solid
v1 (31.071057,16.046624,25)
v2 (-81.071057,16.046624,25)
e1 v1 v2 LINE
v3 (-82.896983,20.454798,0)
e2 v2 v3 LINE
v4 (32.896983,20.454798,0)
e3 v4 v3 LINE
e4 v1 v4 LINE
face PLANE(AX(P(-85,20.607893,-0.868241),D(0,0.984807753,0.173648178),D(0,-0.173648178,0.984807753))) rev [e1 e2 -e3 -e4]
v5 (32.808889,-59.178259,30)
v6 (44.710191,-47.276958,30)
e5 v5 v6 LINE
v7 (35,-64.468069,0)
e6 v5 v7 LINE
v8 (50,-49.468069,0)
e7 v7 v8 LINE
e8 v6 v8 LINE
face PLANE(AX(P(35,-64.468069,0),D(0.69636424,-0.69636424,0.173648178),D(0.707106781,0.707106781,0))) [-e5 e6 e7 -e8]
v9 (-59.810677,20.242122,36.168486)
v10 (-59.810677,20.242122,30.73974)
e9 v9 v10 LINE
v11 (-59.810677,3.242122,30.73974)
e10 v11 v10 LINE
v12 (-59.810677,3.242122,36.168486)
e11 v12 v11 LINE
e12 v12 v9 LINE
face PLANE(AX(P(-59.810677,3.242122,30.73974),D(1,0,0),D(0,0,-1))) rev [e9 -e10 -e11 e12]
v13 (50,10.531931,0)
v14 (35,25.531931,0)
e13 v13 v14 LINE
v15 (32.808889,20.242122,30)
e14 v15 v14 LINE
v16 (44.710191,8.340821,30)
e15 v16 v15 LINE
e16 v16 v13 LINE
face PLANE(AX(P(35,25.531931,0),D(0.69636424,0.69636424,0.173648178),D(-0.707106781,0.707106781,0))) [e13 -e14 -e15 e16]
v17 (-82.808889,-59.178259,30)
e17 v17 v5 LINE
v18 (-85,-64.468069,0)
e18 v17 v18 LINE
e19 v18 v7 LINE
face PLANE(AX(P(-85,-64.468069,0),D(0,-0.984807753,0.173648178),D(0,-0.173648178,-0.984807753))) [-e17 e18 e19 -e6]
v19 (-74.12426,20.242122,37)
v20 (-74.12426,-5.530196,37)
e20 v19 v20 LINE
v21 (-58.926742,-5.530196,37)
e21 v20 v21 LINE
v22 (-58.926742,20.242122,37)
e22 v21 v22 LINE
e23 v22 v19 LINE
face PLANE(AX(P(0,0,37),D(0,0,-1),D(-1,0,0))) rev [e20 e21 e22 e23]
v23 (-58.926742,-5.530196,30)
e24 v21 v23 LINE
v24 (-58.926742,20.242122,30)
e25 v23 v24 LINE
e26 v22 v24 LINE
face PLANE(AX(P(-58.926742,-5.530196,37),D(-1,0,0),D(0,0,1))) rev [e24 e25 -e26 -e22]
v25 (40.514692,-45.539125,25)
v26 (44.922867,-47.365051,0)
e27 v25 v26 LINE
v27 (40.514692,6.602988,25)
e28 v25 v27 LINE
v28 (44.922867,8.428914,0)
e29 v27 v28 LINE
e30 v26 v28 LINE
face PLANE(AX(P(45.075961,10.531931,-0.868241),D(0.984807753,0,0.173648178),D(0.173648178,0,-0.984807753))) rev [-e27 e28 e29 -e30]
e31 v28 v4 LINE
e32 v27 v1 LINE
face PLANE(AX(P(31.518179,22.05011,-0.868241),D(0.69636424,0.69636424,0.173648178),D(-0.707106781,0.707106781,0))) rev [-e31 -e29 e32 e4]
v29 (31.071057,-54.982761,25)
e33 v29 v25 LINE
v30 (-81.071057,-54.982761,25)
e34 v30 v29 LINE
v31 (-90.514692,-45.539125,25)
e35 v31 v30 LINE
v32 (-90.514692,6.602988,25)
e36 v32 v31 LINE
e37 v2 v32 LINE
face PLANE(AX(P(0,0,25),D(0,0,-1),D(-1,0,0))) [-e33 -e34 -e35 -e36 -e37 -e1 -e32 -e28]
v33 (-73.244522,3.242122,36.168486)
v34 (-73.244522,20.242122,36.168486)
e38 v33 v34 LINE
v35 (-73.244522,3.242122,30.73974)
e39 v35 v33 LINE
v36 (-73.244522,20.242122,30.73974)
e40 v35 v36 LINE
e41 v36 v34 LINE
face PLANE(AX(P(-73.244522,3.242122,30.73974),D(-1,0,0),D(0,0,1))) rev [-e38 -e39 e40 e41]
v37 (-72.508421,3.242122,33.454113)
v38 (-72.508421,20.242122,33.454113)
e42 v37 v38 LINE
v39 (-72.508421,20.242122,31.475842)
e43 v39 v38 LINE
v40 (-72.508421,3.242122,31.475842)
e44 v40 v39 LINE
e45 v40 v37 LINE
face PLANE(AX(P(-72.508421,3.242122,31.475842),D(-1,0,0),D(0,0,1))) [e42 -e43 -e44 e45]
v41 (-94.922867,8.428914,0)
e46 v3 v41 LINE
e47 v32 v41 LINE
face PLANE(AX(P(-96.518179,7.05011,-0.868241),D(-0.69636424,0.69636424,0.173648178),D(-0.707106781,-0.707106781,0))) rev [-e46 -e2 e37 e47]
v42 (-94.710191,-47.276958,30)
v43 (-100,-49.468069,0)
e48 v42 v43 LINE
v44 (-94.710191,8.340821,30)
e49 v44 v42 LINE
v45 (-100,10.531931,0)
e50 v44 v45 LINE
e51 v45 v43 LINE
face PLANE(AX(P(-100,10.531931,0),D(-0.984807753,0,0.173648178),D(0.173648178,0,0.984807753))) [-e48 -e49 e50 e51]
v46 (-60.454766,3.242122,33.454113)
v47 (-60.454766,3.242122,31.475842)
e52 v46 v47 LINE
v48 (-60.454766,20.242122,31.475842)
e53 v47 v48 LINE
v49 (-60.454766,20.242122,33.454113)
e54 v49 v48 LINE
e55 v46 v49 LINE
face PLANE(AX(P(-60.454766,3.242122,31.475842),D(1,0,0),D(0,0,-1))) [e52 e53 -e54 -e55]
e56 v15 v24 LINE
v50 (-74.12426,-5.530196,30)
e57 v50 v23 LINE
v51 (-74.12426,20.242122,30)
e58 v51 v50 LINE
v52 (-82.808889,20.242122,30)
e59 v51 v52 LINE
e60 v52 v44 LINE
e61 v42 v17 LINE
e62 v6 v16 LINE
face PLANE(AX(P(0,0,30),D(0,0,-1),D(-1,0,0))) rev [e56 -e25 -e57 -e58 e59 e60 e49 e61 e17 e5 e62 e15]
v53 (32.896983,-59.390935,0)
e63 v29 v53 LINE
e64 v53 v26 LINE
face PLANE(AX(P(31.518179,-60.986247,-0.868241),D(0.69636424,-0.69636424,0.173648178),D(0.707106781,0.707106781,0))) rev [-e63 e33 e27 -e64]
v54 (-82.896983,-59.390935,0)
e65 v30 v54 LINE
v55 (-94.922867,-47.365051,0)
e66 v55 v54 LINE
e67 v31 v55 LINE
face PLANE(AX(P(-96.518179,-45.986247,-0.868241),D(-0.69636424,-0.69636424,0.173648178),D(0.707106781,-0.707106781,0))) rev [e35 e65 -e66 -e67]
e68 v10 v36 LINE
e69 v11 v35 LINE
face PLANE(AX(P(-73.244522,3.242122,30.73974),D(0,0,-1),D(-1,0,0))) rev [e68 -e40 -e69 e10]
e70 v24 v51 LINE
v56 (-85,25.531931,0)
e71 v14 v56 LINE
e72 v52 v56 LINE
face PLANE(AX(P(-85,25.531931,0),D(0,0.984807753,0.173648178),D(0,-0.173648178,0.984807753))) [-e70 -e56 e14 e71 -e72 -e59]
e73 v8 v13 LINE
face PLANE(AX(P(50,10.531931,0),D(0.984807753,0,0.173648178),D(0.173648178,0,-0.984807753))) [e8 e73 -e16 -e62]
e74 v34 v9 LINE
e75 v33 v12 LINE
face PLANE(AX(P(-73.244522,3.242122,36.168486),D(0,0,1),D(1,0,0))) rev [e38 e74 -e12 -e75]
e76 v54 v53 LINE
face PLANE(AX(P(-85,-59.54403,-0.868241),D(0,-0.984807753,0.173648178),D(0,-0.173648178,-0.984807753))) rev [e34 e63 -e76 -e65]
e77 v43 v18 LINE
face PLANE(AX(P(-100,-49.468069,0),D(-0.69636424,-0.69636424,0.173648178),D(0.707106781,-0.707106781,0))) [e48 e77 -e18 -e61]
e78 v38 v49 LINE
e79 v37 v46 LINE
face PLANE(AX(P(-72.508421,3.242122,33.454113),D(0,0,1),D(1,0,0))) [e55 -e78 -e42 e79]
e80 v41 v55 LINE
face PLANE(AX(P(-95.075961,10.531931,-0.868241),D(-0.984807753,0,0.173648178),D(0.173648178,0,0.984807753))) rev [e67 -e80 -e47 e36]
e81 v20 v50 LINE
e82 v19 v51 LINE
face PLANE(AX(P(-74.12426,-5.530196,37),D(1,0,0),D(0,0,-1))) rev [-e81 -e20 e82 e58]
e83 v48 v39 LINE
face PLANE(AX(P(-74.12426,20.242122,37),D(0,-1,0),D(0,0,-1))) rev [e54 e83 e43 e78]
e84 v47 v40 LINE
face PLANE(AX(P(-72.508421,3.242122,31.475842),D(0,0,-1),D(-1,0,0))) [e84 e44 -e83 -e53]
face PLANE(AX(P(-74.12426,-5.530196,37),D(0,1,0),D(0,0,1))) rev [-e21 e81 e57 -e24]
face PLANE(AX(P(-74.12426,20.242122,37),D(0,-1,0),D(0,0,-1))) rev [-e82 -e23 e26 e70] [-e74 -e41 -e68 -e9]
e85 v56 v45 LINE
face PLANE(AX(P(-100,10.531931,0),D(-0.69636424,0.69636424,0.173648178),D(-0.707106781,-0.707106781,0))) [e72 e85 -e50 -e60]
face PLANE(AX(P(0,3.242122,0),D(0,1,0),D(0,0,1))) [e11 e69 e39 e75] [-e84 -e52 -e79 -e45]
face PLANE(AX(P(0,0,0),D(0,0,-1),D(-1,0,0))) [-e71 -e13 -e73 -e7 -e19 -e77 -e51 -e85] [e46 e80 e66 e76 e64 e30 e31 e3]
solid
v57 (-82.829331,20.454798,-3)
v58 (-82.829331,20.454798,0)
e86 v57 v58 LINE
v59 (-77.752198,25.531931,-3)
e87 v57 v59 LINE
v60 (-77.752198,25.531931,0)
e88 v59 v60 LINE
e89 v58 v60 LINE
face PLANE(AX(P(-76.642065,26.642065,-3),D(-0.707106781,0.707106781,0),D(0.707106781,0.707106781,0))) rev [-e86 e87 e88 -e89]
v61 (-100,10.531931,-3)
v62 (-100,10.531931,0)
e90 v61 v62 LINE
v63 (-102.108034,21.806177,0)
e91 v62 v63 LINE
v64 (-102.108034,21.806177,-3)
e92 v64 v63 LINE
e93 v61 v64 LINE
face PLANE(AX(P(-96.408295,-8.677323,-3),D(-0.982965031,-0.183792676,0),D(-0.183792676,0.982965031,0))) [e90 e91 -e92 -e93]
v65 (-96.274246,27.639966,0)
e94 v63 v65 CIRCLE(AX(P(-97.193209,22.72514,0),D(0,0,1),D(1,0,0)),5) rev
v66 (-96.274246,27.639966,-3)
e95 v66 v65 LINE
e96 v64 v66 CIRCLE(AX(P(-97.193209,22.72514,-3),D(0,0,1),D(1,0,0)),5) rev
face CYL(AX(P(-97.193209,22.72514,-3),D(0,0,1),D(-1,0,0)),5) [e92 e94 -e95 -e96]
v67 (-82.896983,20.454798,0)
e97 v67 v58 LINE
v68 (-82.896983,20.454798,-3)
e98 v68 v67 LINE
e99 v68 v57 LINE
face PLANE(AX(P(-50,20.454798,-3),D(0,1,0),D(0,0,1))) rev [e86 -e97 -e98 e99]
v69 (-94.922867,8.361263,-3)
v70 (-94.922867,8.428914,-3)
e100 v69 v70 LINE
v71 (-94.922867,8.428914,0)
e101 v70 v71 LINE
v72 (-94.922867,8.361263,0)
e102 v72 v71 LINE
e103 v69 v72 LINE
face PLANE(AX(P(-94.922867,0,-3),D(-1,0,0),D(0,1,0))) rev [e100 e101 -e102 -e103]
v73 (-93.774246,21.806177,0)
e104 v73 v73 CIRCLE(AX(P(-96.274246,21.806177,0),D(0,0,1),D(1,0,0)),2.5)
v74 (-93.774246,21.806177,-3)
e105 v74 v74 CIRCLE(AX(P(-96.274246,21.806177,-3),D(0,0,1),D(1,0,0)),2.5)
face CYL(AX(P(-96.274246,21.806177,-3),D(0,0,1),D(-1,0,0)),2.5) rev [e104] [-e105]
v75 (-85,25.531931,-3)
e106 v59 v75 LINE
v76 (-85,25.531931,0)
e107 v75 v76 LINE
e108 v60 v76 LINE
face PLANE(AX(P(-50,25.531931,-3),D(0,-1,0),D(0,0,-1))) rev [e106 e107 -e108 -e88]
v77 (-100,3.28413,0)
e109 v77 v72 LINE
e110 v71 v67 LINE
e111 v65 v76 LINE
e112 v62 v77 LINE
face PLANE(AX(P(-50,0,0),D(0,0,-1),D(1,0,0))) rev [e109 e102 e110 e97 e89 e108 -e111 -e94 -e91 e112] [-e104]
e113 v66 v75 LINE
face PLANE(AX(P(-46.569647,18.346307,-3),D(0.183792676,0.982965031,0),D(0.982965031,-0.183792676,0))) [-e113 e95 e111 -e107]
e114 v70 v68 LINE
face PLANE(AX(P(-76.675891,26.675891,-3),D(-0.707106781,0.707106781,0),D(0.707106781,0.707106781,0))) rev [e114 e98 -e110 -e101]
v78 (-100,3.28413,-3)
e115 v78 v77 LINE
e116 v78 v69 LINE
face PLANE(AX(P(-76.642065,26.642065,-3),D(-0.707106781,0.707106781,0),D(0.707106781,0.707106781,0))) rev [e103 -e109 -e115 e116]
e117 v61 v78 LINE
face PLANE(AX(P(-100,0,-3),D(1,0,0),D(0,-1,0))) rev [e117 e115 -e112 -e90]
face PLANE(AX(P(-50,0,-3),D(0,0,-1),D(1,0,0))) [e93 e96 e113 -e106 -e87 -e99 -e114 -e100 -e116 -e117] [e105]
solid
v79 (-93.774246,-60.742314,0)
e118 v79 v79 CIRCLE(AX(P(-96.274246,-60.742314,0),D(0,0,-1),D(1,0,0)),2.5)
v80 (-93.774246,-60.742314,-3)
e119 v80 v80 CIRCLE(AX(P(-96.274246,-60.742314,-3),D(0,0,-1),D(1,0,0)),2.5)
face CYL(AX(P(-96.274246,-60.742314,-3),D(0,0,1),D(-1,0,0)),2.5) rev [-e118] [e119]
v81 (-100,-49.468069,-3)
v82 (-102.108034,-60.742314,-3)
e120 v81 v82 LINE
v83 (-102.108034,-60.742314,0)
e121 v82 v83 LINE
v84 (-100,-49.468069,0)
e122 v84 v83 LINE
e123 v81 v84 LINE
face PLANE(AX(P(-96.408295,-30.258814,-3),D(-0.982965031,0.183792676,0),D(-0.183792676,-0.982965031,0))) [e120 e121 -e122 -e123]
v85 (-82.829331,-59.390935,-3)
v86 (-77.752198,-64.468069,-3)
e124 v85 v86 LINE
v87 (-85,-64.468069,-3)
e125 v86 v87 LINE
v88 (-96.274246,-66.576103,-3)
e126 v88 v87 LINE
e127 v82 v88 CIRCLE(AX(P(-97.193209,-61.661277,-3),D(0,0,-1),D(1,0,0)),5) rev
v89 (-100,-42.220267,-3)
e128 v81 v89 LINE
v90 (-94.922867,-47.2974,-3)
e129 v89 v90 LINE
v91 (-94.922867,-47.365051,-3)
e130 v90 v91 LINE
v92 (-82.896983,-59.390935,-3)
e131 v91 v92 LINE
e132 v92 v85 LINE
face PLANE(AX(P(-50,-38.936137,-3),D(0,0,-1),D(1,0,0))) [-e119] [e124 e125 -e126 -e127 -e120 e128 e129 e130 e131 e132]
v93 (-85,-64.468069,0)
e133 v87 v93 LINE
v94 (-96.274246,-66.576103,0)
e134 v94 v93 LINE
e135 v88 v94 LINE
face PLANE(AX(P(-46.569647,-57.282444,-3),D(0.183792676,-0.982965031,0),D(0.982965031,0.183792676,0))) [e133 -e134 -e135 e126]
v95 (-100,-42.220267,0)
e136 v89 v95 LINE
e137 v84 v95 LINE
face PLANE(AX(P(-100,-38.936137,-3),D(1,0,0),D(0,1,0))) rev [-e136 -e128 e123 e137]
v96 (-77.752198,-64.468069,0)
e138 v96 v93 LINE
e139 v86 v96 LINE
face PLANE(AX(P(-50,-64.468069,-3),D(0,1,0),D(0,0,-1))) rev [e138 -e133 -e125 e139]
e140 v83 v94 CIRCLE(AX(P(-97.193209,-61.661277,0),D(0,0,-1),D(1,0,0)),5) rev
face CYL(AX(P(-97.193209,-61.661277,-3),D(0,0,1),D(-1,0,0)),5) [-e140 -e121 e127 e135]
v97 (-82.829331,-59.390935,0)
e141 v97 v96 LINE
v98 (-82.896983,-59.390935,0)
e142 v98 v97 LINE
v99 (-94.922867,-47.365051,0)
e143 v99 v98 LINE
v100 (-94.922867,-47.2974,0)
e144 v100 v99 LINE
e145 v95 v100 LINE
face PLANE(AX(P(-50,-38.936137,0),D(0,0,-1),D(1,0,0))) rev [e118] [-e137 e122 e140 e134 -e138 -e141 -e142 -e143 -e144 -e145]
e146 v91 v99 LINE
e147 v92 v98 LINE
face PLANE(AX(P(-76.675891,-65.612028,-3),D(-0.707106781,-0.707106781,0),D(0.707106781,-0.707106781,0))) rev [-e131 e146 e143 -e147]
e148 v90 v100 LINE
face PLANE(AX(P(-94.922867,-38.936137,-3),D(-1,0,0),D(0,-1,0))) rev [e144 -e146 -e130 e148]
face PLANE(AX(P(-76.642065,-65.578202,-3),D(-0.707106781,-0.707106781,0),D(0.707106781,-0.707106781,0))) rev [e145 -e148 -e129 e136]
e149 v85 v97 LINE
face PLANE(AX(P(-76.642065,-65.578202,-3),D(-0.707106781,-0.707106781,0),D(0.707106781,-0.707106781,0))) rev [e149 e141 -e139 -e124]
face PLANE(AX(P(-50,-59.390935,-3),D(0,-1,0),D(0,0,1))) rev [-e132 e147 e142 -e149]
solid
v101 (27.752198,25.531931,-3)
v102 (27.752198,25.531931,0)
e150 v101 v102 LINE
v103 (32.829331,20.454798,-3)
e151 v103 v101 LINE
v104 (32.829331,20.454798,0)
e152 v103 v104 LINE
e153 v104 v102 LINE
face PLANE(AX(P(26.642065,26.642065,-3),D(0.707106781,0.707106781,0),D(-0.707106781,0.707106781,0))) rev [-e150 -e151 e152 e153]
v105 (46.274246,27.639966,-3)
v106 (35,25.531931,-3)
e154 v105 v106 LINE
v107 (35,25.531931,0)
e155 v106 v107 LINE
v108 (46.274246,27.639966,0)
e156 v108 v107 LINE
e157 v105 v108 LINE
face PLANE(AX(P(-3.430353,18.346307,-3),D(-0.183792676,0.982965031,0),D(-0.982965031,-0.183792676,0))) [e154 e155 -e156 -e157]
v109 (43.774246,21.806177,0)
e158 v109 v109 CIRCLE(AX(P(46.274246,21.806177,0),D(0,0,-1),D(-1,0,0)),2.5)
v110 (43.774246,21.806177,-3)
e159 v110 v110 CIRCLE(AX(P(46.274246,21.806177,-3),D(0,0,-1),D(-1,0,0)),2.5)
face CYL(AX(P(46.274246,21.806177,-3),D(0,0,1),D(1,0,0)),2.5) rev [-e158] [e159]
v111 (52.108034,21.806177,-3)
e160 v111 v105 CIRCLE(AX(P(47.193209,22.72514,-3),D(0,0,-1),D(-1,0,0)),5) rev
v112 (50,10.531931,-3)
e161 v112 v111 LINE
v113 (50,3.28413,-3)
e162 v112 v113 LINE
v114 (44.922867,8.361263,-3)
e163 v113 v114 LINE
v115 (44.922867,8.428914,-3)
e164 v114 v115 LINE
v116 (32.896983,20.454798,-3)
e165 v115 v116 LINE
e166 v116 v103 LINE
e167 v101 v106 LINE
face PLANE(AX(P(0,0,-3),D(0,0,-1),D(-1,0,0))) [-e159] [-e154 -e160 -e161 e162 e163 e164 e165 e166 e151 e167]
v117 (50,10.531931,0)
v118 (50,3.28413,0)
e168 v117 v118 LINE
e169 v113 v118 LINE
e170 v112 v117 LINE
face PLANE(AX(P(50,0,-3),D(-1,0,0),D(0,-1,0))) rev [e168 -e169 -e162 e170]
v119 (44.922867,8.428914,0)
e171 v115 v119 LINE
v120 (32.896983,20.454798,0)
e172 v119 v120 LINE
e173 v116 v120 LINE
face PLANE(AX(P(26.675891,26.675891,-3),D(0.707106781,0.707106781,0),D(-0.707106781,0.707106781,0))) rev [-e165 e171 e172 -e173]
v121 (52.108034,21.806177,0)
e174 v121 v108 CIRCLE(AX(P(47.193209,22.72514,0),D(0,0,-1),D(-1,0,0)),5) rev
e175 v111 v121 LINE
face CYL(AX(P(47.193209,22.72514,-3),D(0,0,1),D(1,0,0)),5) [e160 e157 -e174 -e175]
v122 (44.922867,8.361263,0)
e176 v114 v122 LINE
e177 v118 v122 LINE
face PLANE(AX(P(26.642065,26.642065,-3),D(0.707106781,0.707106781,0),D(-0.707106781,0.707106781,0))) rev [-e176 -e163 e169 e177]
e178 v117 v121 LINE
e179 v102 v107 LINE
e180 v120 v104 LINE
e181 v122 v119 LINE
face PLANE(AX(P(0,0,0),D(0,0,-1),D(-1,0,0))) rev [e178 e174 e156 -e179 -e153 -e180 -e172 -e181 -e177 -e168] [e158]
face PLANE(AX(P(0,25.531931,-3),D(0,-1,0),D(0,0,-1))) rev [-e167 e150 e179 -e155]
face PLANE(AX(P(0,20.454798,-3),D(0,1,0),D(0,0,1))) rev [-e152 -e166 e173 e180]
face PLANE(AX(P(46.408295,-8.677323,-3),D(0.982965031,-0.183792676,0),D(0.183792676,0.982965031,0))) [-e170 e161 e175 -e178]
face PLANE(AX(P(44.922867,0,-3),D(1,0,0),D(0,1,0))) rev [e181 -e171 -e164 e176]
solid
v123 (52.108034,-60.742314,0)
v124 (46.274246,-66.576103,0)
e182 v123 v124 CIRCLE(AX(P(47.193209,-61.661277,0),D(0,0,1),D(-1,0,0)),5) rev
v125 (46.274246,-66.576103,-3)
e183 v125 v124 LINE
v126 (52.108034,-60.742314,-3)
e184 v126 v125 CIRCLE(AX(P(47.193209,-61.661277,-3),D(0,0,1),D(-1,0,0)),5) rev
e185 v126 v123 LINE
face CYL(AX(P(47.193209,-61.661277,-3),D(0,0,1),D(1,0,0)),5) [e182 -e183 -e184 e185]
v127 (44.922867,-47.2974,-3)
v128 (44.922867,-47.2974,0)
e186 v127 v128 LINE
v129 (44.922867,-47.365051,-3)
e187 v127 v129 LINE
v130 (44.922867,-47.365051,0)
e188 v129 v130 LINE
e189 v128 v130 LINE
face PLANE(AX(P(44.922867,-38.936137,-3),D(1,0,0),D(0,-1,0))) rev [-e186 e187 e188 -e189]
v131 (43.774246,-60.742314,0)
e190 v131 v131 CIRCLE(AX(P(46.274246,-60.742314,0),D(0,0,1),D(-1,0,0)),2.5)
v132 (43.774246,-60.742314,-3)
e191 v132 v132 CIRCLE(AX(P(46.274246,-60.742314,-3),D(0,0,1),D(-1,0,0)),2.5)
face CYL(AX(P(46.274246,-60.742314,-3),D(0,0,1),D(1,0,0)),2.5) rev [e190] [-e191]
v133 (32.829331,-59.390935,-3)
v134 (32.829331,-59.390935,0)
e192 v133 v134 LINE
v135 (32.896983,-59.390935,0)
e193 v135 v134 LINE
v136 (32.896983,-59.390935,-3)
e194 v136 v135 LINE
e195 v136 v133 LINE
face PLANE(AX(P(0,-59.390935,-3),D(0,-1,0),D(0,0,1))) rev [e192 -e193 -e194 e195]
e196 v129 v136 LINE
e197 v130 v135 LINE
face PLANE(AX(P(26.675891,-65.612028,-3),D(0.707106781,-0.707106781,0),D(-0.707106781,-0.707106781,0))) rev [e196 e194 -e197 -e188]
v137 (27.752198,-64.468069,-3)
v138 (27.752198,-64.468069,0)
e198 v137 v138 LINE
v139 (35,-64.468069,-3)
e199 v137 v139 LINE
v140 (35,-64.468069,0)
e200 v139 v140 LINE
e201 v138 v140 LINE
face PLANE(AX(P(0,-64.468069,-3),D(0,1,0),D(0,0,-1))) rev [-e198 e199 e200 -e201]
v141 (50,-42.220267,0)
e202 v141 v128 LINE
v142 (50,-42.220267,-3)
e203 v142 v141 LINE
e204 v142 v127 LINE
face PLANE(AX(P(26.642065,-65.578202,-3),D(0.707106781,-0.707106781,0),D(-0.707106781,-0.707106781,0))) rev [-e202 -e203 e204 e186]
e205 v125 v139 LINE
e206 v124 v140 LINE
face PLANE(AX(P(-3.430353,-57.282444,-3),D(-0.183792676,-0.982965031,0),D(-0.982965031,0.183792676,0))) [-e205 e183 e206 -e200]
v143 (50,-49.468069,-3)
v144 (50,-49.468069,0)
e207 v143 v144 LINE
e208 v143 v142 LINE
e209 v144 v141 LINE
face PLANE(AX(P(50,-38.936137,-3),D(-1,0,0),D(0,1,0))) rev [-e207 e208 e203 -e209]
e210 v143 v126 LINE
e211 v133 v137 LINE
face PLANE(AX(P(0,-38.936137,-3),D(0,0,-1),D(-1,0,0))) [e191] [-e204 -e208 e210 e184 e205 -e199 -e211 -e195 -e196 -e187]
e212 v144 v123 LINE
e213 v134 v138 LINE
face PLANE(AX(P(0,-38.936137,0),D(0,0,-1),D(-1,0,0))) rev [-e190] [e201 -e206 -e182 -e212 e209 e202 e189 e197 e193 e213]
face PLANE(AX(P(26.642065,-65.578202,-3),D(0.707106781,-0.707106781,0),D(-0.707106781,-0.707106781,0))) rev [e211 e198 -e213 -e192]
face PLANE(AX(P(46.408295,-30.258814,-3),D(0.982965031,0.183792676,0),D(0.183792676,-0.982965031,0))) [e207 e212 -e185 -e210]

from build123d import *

# Parameters (mm, degrees)
BOSS_EXTRUDE1_DEPTH     = 30
BOSS_EXTRUDE1_TAPER     = 10
SHELL1_T                = -5
SKETCH6_W               = 15.197518051
SKETCH6_H               = 25.772318446
BOSS_EXTRUDE4_DEPTH     = 7
SKETCH7_W               = 13.433844537
SKETCH7_H               = 5.428745395
SKETCH7_W_2             = 12.053655029
SKETCH7_H_2             = 1.978271627
CUT_EXTRUDE2_DEPTH      = 17
BOSS_EXTRUDE5_OUTLINE_R = 2.499999953
BOSS_EXTRUDE5_DEPTH     = 3


# Read off the part's stored shape, not the designer's step: Boss-Extrude5
with BuildPart() as part:
    # Sketch1 → Boss-Extrude1 (new body)
    with BuildSketch(Plane.XY):
        Polygon((-100, 10.531931481), (-100, -49.468068519), (-85, -64.468068519), (35, -64.468068519), (50, -49.468068519), (50, 10.531931481), (35, 25.531931481), (-85, 25.531931481), align=None)
    extrude(amount=BOSS_EXTRUDE1_DEPTH, taper=BOSS_EXTRUDE1_TAPER)

    # Shell1
    shell1_openings = [part.faces().sort_by_distance(p)[0] for p in [
        (-25, -19.468068519, 0),
    ]]
    offset(amount=SHELL1_T, openings=shell1_openings, kind=Kind.INTERSECTION)

    # Sketch6 → Boss-Extrude4 (add)
    with BuildSketch(Plane.XY.offset(30)):
        with Locations((-66.525501272, 7.355962837)):
            Rectangle(SKETCH6_W, SKETCH6_H)
    extrude(amount=BOSS_EXTRUDE4_DEPTH)

    # Sketch7 → Cut-Extrude2 (cut)
    with BuildSketch(Plane(origin=(0, 20.24212206, 0), x_dir=(1, 0, 0), z_dir=(0, 1, 0))):
        with Locations((-66.527599538, -33.454113167)):
            Rectangle(SKETCH7_W, SKETCH7_H)
        with Locations((-66.481593222, -32.464977353)):
            Rectangle(SKETCH7_W_2, SKETCH7_H_2, mode=Mode.SUBTRACT)
    extrude(amount=-CUT_EXTRUDE2_DEPTH, mode=Mode.SUBTRACT)


with BuildPart() as body_2:
    # Boss-Extrude5 outline → Boss-Extrude5 (new body)
    with BuildSketch(Plane(origin=(0, 0, 0), x_dir=(-1, 0, 0), z_dir=(0, 0, -1))):
        with BuildLine():
            ThreePointArc((-46.274245509, 27.639965524), (-50.728742794, 26.260674275), (-52.108034043, 21.80617699))
            Line((-52.108034043, 21.80617699), (-50, 10.531931481))
            Line((-50, 10.531931481), (-50, 3.284129796))
            Line((-50, 3.284129796), (-44.922866941, 8.361262855))
            Line((-44.922866941, 8.361262855), (-44.922866941, 8.42891411))
            Line((-44.922866941, 8.42891411), (-32.896982629, 20.454798422))
            Line((-32.896982629, 20.454798422), (-32.829331374, 20.454798422))
            Line((-32.829331374, 20.454798422), (-27.752198315, 25.531931481))
            Line((-27.752198315, 25.531931481), (-35, 25.531931481))
            Line((-35, 25.531931481), (-46.274245509, 27.639965524))
        make_face()
        with Locations((-46.274245509, 21.80617699)):
            Circle(BOSS_EXTRUDE5_OUTLINE_R, mode=Mode.SUBTRACT)
    extrude(amount=BOSS_EXTRUDE5_DEPTH)


with BuildPart() as body_3:
    # Mirror6: mirrored copy
    add(body_2.part.mirror(Plane(origin=(0, -19.468068519, 0), x_dir=(0, 0, 1), z_dir=(0, -1, 0))))


with BuildPart() as body_4:
    # Mirror7: mirrored copy
    add(body_3.part.mirror(Plane(origin=(-25, 0, 0), x_dir=(0, 0, 1), z_dir=(1, 0, 0))))


with BuildPart() as body_5:
    # Mirror7 2: mirrored copy
    add(body_2.part.mirror(Plane(origin=(-25, 0, 0), x_dir=(0, 0, 1), z_dir=(1, 0, 0))))


solid = Compound([part.part, body_2.part, body_3.part, body_4.part, body_5.part])
